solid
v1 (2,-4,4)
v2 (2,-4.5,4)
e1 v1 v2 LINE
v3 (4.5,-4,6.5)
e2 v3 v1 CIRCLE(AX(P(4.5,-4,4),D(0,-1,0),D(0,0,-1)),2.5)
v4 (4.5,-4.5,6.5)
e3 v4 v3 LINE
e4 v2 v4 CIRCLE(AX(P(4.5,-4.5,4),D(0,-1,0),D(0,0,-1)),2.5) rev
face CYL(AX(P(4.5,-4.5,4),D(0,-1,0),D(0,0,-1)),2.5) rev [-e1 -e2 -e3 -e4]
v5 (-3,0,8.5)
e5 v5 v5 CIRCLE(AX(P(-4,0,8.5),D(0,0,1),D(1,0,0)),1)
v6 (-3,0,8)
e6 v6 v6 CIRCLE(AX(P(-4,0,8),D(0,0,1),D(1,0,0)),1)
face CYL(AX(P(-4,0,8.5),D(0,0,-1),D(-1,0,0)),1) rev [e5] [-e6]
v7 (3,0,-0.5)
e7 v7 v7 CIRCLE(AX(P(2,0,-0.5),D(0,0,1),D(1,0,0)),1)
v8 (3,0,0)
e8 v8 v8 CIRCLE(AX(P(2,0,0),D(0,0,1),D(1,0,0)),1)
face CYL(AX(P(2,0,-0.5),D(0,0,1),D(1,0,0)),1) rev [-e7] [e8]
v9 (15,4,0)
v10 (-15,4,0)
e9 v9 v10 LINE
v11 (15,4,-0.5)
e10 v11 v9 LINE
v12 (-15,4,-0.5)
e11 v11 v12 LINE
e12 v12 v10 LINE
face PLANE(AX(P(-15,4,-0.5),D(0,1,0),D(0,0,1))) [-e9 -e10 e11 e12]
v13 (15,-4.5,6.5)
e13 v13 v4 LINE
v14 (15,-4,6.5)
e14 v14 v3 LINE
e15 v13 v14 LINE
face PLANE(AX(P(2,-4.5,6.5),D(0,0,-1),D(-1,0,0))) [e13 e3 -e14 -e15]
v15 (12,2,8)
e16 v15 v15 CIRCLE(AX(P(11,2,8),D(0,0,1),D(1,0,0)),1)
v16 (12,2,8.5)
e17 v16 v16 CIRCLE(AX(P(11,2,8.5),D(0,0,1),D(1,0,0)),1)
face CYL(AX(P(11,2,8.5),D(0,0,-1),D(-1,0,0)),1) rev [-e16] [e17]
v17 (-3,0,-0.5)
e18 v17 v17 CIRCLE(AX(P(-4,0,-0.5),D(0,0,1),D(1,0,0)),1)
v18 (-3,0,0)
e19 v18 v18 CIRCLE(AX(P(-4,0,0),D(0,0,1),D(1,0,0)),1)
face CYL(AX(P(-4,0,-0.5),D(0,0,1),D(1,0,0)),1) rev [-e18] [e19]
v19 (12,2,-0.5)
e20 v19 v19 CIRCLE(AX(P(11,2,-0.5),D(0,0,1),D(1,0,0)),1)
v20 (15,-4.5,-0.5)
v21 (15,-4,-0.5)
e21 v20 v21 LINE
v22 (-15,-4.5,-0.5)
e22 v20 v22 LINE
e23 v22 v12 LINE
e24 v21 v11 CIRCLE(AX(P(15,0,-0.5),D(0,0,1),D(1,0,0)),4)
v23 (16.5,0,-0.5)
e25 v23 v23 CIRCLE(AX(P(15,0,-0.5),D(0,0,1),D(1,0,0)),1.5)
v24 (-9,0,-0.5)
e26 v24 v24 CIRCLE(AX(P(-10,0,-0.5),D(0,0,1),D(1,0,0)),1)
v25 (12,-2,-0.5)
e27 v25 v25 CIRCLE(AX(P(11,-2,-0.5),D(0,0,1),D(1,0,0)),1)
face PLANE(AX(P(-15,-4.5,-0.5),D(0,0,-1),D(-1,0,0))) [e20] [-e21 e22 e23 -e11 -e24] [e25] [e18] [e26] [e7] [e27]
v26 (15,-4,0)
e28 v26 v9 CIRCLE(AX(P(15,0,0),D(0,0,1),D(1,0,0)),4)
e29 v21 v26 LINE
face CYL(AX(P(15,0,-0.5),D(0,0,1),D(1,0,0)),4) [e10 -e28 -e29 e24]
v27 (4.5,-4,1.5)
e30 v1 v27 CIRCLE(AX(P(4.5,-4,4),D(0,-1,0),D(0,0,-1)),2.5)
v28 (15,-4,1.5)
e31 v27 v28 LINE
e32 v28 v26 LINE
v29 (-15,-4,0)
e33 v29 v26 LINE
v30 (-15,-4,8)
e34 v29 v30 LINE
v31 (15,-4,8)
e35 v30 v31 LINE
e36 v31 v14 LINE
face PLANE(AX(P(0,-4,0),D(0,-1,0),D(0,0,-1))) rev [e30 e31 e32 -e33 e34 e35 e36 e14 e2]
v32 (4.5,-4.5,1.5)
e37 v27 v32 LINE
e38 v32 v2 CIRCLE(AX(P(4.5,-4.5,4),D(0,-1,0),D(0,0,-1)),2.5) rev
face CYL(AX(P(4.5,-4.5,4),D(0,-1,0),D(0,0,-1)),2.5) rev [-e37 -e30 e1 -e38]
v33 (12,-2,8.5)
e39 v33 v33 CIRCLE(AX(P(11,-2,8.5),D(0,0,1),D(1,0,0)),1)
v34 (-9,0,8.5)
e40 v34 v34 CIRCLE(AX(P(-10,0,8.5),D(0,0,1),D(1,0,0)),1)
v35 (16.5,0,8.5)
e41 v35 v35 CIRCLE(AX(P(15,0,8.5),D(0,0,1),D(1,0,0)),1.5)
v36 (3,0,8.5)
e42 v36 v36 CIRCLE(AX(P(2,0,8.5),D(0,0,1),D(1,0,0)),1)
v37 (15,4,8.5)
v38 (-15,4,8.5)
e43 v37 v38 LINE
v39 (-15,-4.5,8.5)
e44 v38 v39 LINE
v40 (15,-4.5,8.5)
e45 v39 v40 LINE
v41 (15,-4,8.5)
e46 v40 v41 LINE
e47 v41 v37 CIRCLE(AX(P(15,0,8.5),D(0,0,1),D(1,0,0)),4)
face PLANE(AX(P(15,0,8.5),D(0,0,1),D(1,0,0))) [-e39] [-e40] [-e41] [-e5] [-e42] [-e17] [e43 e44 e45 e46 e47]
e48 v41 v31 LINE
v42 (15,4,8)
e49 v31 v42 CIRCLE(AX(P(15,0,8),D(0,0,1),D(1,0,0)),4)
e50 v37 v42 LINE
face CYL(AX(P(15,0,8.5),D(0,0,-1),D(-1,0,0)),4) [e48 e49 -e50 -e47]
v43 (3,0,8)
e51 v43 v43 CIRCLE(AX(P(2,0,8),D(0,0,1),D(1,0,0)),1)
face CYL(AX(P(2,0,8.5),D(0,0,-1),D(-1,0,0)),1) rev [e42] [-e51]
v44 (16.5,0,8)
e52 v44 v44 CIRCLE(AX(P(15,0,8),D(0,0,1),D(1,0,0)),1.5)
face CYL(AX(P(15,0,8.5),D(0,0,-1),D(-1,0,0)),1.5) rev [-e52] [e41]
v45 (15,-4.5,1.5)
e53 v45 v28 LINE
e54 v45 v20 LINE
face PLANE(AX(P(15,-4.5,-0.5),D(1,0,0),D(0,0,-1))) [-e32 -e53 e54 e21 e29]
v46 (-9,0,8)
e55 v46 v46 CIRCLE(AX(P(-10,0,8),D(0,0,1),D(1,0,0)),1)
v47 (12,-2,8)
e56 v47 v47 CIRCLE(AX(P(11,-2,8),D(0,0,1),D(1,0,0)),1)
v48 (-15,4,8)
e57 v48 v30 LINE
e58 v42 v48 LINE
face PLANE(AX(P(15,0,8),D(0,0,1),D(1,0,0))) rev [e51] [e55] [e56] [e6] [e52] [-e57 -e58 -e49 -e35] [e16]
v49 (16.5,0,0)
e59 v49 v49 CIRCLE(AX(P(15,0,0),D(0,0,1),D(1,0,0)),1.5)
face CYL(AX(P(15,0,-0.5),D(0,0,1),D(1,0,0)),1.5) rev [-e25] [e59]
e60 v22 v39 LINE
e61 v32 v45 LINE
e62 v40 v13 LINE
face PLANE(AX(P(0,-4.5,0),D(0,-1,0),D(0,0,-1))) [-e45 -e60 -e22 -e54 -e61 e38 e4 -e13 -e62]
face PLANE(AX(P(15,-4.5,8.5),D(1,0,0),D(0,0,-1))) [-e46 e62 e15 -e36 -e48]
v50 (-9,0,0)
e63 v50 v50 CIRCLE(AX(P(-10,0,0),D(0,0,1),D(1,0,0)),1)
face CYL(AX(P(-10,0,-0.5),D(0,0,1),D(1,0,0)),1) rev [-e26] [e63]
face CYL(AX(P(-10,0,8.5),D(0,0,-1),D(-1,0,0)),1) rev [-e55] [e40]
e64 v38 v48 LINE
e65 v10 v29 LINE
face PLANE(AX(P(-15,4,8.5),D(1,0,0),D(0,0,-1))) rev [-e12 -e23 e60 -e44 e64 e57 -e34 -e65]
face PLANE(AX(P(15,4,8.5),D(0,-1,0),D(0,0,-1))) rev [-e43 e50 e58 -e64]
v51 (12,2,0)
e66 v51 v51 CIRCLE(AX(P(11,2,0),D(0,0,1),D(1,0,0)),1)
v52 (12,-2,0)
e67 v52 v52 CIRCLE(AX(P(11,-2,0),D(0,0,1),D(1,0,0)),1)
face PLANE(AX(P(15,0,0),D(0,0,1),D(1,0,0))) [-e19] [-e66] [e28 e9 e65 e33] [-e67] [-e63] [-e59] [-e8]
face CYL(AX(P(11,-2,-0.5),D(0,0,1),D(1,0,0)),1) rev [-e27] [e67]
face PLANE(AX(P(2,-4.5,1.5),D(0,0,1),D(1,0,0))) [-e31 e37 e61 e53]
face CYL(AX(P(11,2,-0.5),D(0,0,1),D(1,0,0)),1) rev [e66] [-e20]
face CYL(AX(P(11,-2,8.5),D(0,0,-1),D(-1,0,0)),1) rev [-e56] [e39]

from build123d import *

# Parameters (mm, degrees)
SKETCH_2_R      = 1.5
SKETCH_2_R_2    = 1
EXTRUDE_1_DEPTH = 0.5
SKETCH_1_R      = 1.5
SKETCH_1_R_2    = 1
EXTRUDE_2_DEPTH = 0.5
EXTRUDE_4_DEPTH = 0.5
FILLET_1_R      = 2.5


with BuildPart() as part:
    # 草图2 → 凸台-拉伸1 (new body)
    with BuildSketch(Plane.XY.offset(8)):
        with BuildLine():
            Line((15, 4), (-15, 4))
            Line((-15, 4), (-15, -4))
            Line((-15, -4), (15, -4))
            ThreePointArc((15, -4), (19, 0), (15, 4))
        make_face()
        with Locations((15, 0)):
            Circle(SKETCH_2_R, mode=Mode.SUBTRACT)
        with Locations((11, -2)):
            Circle(SKETCH_2_R_2, mode=Mode.SUBTRACT)
        with Locations((11, 2)):
            Circle(SKETCH_2_R_2, mode=Mode.SUBTRACT)
        with Locations((2, 0)):
            Circle(SKETCH_2_R_2, mode=Mode.SUBTRACT)
        with Locations((-4, 0)):
            Circle(SKETCH_2_R_2, mode=Mode.SUBTRACT)
        with Locations((-10, 0)):
            Circle(SKETCH_2_R_2, mode=Mode.SUBTRACT)
    extrude(amount=EXTRUDE_1_DEPTH)



with BuildPart() as body_2:
    # 草图1 → 凸台-拉伸2 (new body)
    with BuildSketch(Plane.XY):
        with BuildLine():
            Line((-15, 4), (15, 4))
            ThreePointArc((15, 4), (19, 0), (15, -4))
            Line((15, -4), (-15, -4))
            Line((-15, -4), (-15, 4))
        make_face()
        with Locations((15, 0)):
            Circle(SKETCH_1_R, mode=Mode.SUBTRACT)
        with Locations((-10, 0)):
            Circle(SKETCH_1_R_2, mode=Mode.SUBTRACT)
        with Locations((-4, 0)):
            Circle(SKETCH_1_R_2, mode=Mode.SUBTRACT)
        with Locations((2, 0)):
            Circle(SKETCH_1_R_2, mode=Mode.SUBTRACT)
        with Locations((11, 2)):
            Circle(SKETCH_1_R_2, mode=Mode.SUBTRACT)
        with Locations((11, -2)):
            Circle(SKETCH_1_R_2, mode=Mode.SUBTRACT)
    extrude(amount=-EXTRUDE_2_DEPTH)


with BuildPart() as part_1:
    add(part.part)

    add(body_2.part)  # 凸台-拉伸4 merges body 2
    # 草图4 → 凸台-拉伸4 (add)
    with BuildSketch(Plane(origin=(0, -4, 0), x_dir=(1, 0, 0), z_dir=(0, 1, 0))):
        Polygon((-15, 0.5), (2, 0.5), (15, 0.5), (15, -1.5), (2, -1.5), (2, -6.5), (15, -6.5), (15, -8.5), (2, -8.5), (-15, -8.5), align=None)
    extrude(amount=-EXTRUDE_4_DEPTH)

    # 圆角1
    fillet_1_edges = [part_1.edges().sort_by_distance(p)[0] for p in [
        (2, -4.25, 1.5),
        (2, -4.25, 6.5),
    ]]
    fillet(fillet_1_edges, radius=FILLET_1_R - 0.0001)  # a hair under: the kernel refuses the full size


solid = part_1.part
